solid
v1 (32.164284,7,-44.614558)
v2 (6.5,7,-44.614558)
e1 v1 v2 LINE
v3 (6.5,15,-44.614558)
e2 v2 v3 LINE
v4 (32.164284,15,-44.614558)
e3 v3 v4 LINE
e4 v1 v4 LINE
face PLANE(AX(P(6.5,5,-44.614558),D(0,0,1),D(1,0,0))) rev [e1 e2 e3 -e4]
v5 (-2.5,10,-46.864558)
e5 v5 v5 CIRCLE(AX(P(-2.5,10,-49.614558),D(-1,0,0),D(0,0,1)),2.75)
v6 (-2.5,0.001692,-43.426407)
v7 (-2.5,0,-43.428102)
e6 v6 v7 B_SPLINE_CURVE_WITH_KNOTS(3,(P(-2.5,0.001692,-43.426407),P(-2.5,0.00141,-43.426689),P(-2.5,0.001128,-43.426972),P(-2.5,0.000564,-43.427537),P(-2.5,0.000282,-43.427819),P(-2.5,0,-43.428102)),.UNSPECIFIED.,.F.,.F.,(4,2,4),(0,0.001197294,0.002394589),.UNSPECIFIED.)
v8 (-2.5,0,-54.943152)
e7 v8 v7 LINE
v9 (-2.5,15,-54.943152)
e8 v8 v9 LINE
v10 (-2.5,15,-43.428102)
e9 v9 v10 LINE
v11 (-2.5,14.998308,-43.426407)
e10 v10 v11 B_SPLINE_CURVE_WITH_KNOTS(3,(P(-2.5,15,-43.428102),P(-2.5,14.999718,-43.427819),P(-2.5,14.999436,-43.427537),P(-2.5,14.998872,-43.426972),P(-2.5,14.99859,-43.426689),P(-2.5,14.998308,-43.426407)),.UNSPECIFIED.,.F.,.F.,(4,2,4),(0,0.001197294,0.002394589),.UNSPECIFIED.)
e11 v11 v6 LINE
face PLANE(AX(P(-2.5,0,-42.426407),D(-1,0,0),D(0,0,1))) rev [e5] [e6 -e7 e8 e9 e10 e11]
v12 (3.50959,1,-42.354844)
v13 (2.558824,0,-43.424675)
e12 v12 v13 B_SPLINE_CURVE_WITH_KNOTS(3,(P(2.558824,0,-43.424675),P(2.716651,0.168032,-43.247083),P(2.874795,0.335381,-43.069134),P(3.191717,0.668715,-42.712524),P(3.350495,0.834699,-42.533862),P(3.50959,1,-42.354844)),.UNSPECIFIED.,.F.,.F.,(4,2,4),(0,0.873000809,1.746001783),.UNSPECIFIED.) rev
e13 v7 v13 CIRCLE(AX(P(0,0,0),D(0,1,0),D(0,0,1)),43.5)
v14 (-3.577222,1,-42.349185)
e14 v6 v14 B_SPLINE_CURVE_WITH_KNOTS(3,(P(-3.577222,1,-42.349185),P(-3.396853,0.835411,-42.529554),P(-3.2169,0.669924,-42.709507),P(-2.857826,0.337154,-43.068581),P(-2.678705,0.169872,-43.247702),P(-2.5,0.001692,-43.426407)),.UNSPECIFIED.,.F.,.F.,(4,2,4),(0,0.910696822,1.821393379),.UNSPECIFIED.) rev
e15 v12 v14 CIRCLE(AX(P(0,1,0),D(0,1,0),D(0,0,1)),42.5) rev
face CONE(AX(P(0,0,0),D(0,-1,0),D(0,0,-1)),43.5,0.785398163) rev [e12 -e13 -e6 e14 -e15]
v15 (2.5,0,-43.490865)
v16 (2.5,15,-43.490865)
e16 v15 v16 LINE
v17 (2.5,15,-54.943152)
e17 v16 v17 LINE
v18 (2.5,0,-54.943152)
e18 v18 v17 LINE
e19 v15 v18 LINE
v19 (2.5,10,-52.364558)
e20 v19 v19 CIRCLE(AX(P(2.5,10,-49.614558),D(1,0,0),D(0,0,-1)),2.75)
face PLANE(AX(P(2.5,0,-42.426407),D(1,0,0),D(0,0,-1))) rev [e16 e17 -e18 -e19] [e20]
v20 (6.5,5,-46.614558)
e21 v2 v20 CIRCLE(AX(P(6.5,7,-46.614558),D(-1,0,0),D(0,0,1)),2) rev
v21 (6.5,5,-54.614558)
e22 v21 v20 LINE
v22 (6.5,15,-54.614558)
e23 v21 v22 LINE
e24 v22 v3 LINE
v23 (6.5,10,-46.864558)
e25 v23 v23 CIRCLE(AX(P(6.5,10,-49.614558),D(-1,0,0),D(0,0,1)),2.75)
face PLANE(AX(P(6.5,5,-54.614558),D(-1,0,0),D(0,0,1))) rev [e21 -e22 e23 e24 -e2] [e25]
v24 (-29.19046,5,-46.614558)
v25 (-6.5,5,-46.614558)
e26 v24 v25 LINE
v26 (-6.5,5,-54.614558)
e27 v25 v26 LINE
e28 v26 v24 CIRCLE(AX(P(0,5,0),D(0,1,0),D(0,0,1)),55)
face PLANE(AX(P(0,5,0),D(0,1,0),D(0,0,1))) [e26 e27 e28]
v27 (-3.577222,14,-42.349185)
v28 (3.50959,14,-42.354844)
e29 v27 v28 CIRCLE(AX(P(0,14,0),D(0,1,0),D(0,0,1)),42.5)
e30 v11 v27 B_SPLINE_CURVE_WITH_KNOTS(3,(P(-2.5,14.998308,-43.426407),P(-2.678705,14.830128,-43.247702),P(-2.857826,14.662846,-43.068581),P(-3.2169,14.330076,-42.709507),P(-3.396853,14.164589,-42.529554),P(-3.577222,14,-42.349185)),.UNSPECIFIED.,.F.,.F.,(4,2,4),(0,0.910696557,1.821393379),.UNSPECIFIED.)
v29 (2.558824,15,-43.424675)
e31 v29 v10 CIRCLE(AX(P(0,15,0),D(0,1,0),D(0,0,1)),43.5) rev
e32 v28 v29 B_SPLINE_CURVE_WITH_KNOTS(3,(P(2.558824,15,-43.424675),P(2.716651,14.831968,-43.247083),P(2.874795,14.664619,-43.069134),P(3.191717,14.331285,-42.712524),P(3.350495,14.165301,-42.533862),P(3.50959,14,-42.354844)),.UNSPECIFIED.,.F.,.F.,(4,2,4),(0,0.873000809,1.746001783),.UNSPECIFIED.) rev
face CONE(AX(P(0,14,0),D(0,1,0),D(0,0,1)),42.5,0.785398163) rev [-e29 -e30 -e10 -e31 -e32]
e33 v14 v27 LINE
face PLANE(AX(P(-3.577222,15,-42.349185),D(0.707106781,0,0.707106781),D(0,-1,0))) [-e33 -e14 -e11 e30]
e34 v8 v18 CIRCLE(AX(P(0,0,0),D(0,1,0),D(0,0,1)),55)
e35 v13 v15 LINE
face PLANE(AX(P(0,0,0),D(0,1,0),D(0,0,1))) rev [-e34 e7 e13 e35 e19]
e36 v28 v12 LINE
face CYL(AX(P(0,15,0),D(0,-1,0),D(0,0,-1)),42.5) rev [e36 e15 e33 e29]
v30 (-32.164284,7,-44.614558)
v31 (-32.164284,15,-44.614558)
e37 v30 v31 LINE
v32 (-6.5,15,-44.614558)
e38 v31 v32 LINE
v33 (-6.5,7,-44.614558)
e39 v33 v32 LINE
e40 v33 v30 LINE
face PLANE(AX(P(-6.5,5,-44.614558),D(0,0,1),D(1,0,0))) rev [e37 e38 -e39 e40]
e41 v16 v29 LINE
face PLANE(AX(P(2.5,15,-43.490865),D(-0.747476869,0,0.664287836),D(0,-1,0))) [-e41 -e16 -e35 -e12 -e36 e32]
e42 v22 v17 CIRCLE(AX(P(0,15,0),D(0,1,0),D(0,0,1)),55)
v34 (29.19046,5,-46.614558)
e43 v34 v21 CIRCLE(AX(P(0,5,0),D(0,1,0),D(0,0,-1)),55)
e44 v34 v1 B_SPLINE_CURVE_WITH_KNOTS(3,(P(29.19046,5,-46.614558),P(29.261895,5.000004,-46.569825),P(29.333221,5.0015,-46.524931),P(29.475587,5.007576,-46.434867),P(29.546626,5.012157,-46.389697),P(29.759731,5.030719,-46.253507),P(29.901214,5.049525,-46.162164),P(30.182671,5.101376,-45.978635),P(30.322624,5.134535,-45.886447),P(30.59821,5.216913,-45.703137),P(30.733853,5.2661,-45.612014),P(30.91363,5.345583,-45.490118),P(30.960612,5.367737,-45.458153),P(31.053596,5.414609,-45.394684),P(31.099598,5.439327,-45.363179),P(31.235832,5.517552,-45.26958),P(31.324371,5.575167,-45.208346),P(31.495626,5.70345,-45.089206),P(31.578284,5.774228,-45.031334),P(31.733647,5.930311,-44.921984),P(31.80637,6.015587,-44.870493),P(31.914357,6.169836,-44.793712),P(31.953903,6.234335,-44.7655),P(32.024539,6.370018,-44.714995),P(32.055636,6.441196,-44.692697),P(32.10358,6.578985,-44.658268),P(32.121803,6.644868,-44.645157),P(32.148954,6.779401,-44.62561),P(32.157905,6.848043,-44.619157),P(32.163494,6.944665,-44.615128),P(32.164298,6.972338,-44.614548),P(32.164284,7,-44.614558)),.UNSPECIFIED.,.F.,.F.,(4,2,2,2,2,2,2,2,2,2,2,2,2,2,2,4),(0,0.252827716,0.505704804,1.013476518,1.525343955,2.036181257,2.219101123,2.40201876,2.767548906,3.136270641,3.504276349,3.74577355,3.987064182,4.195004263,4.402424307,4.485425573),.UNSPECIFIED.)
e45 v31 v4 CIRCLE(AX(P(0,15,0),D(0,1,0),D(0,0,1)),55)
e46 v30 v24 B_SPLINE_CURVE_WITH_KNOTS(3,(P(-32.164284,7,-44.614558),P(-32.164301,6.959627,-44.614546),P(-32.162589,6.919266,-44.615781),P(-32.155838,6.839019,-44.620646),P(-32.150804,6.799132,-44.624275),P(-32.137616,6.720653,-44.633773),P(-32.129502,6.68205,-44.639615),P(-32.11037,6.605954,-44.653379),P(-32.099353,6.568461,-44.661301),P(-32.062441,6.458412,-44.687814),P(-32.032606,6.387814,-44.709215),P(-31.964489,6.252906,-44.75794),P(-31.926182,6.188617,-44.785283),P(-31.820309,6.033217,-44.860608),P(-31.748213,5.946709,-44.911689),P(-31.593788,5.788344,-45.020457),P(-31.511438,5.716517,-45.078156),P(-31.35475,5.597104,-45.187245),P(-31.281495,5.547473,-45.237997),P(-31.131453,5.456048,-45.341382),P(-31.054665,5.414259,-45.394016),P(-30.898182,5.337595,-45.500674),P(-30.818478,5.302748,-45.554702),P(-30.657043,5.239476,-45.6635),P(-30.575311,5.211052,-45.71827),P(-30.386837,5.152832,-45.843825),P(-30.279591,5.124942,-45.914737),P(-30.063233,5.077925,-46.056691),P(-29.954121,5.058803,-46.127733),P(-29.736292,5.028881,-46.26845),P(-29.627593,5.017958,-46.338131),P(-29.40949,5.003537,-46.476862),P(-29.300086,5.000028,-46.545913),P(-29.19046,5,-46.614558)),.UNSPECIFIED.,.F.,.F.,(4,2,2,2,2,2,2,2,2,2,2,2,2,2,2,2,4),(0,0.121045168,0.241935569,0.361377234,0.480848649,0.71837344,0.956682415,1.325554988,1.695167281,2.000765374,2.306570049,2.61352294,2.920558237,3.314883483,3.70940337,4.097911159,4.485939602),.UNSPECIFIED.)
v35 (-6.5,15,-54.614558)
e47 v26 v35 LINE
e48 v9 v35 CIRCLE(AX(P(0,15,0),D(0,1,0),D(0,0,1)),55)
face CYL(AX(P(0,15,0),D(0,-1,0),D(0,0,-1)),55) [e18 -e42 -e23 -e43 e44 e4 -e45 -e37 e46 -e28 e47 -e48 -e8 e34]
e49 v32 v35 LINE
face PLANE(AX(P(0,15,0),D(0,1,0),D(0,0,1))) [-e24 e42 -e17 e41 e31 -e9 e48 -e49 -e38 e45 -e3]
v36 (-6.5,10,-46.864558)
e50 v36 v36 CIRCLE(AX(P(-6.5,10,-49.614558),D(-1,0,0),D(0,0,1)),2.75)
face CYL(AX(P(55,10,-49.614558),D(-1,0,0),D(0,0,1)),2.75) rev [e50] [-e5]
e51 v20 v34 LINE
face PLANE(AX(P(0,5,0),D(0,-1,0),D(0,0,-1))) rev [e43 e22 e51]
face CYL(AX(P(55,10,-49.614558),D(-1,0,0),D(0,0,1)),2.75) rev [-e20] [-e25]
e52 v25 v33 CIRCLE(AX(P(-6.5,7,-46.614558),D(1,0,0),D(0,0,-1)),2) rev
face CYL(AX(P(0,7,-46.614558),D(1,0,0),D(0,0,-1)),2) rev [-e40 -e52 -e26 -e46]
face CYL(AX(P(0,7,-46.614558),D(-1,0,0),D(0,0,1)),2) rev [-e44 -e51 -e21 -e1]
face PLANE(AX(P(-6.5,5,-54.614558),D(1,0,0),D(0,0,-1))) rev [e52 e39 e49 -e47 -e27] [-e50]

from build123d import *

# Parameters (mm, degrees)
SKETCH1_R           = 55
SKETCH1_R_2         = 42.5
BOSS_EXTRUDE1_DEPTH = 15
CUT_EXTRUDE1_DEPTH  = 80.214897589
CUT_EXTRUDE2_START  = -10
CUT_EXTRUDE2_DEPTH  = 10
SKETCH4_R           = 2.75
CUT_EXTRUDE3_DEPTH  = 84.858511792
FILLET2_R           = 2
CHAMFER1_SIZE       = 1.064458421
CHAMFER1_SIZE_2     = 1


with BuildPart() as part:
    # Sketch1 → Boss-Extrude1 (new body)
    with BuildSketch(Plane(origin=(0, 0, 0), x_dir=(1, 0, 0), z_dir=(0, 1, 0))):
        with Locations(Location((0, 0, 0), (0, 0, 270))):
            Circle(SKETCH1_R)
        with Locations(Location((0, 0, 0), (0, 0, 270))):
            Circle(SKETCH1_R_2, mode=Mode.SUBTRACT)
    extrude(amount=BOSS_EXTRUDE1_DEPTH)

    # Sketch2 → Cut-Extrude1 (cut, through all)
    with BuildSketch(Plane(origin=(0, 15, 0), x_dir=(1, 0, 0), z_dir=(0, 1, 0))):
        with BuildLine():
            Line((-2.5, 42.426406871), (-2.5, 54.94315244))
            ThreePointArc((-2.5, 54.94315244), (0, 55), (2.5, 54.94315244))
            Line((2.5, 54.94315244), (2.5, 42.426406871))
            ThreePointArc((2.5, 42.426406871), (0, 42.5), (-2.5, 42.426406871))
        make_face()
    extrude(amount=-CUT_EXTRUDE1_DEPTH, mode=Mode.SUBTRACT)

    # Sketch3 → Cut-Extrude2 (cut)
    with BuildSketch(Plane(origin=(0, 15, 0), x_dir=(1, 0, 0), z_dir=(0, 1, 0)).offset(CUT_EXTRUDE2_START)):
        with BuildLine():
            Line((-6.5, 54.614558499), (-6.5, 44.614558499))
            Line((-6.5, 44.614558499), (-32.164284074, 44.614558499))
            ThreePointArc((-32.164284074, 44.614558499), (-19.96826772, 51.247129522), (-6.5, 54.614558499))
        make_face()
        with BuildLine():
            Line((6.5, 44.614558499), (32.164284074, 44.614558499))
            ThreePointArc((32.164284074, 44.614558499), (19.96826772, 51.247129522), (6.5, 54.614558499))
            Line((6.5, 54.614558499), (6.5, 44.614558499))
        make_face()
    extrude(amount=CUT_EXTRUDE2_DEPTH, mode=Mode.SUBTRACT)

    # Sketch4 → Cut-Extrude3 (cut, through all)
    with BuildSketch(Plane.ZY.offset(6.5)):
        with Locations((-49.614558499, 10)):
            Circle(SKETCH4_R)
    extrude(amount=-CUT_EXTRUDE3_DEPTH, mode=Mode.SUBTRACT)

    # Fillet2
    fillet2_edges = [part.edges().sort_by_distance(p)[0] for p in [
        (-19.332142037, 5, -44.614558499),
        (19.332142037, 5, -44.614558499),
    ]]
    fillet(fillet2_edges, radius=FILLET2_R)

    # Chamfer1
    # the kernel refuses this chamfer: 1.064458421, 1 mm, written as the material it takes off along each edge
    with BuildSketch(Plane(origin=(2.5, 17.741623876, -42.426406871), x_dir=(0, 0, -1), z_dir=(0, -1, 0))) as chamfer1_piece_1:
        with BuildLine():
            Line((CHAMFER1_SIZE, 0), (-0.071563276, 1.009590298))
            ThreePointArc((-0.071563276, 1.009590298), (-0.033856315, 0.520208167), (0, 0))
            Line((0, 0), (CHAMFER1_SIZE, 0))
        make_face()
    extrude(amount=20.483247753, mode=Mode.SUBTRACT)
    with BuildSketch(Plane(origin=(-2.5, 17.781296166, -42.426406871), x_dir=(0, 0, -1), z_dir=(0, -1, 0))) as chamfer1_piece_2:
        with BuildLine():
            Line((CHAMFER1_SIZE_2, 0), (-0.077221697, -1.077221697))
            ThreePointArc((-0.077221697, -1.077221697), (-0.03634309, -0.554912866), (0, 0))
            Line((0, 0), (CHAMFER1_SIZE_2, 0))
        make_face()
    extrude(amount=20.562592333, mode=Mode.SUBTRACT)
    # the kernel refuses this chamfer: 1.064458421, 1 mm, written as the material it takes off along each edge
    with BuildSketch(Plane(origin=(0, 0, 0), x_dir=(-0.023665071979994685, 0, -0.9997199429681204), z_dir=(0.9997199429681204, 0, -0.023665071979994685))) as chamfer1_2_piece_1:
        Polygon((42.5 + CHAMFER1_SIZE_2, 0), (42.5, CHAMFER1_SIZE_2), (42.5, 0), align=None)
    revolve(axis=Axis((0, 0, 0), (0, 1, 0)), revolution_arc=178.643964662, mode=Mode.SUBTRACT)
    with BuildSketch(Plane(origin=(0, 15, 0), x_dir=(0, 0, 1), z_dir=(-1, 0, 0))) as chamfer1_2_piece_2:
        Polygon((42.5 + CHAMFER1_SIZE_2, 0), (42.5, -CHAMFER1_SIZE_2), (42.5, 0), align=None)
    revolve(axis=Axis((0, 15, 0), (0, 1, 0)), revolution_arc=178.735465076, mode=Mode.SUBTRACT)
    with BuildSketch(Plane(origin=(0, 15, 0), x_dir=(-0.023665071979993797, 0, -0.9997199429681204), z_dir=(0.9997199429681204, 0, -0.023665071979993797))) as chamfer1_2_piece_3:
        Polygon((42.5 + CHAMFER1_SIZE_2, 0), (42.5, -CHAMFER1_SIZE_2), (42.5, 0), align=None)
    revolve(axis=Axis((0, 15, 0), (0, 1, 0)), revolution_arc=178.643964662, mode=Mode.SUBTRACT)
    with BuildSketch(Plane(origin=(0, 0, 0), x_dir=(0, 0, 1), z_dir=(-1, 0, 0))) as chamfer1_2_piece_4:
        Polygon((42.5 + CHAMFER1_SIZE_2, 0), (42.5, CHAMFER1_SIZE_2), (42.5, 0), align=None)
    revolve(axis=Axis((0, 0, 0), (0, 1, 0)), revolution_arc=178.735465076, mode=Mode.SUBTRACT)


solid = part.part
